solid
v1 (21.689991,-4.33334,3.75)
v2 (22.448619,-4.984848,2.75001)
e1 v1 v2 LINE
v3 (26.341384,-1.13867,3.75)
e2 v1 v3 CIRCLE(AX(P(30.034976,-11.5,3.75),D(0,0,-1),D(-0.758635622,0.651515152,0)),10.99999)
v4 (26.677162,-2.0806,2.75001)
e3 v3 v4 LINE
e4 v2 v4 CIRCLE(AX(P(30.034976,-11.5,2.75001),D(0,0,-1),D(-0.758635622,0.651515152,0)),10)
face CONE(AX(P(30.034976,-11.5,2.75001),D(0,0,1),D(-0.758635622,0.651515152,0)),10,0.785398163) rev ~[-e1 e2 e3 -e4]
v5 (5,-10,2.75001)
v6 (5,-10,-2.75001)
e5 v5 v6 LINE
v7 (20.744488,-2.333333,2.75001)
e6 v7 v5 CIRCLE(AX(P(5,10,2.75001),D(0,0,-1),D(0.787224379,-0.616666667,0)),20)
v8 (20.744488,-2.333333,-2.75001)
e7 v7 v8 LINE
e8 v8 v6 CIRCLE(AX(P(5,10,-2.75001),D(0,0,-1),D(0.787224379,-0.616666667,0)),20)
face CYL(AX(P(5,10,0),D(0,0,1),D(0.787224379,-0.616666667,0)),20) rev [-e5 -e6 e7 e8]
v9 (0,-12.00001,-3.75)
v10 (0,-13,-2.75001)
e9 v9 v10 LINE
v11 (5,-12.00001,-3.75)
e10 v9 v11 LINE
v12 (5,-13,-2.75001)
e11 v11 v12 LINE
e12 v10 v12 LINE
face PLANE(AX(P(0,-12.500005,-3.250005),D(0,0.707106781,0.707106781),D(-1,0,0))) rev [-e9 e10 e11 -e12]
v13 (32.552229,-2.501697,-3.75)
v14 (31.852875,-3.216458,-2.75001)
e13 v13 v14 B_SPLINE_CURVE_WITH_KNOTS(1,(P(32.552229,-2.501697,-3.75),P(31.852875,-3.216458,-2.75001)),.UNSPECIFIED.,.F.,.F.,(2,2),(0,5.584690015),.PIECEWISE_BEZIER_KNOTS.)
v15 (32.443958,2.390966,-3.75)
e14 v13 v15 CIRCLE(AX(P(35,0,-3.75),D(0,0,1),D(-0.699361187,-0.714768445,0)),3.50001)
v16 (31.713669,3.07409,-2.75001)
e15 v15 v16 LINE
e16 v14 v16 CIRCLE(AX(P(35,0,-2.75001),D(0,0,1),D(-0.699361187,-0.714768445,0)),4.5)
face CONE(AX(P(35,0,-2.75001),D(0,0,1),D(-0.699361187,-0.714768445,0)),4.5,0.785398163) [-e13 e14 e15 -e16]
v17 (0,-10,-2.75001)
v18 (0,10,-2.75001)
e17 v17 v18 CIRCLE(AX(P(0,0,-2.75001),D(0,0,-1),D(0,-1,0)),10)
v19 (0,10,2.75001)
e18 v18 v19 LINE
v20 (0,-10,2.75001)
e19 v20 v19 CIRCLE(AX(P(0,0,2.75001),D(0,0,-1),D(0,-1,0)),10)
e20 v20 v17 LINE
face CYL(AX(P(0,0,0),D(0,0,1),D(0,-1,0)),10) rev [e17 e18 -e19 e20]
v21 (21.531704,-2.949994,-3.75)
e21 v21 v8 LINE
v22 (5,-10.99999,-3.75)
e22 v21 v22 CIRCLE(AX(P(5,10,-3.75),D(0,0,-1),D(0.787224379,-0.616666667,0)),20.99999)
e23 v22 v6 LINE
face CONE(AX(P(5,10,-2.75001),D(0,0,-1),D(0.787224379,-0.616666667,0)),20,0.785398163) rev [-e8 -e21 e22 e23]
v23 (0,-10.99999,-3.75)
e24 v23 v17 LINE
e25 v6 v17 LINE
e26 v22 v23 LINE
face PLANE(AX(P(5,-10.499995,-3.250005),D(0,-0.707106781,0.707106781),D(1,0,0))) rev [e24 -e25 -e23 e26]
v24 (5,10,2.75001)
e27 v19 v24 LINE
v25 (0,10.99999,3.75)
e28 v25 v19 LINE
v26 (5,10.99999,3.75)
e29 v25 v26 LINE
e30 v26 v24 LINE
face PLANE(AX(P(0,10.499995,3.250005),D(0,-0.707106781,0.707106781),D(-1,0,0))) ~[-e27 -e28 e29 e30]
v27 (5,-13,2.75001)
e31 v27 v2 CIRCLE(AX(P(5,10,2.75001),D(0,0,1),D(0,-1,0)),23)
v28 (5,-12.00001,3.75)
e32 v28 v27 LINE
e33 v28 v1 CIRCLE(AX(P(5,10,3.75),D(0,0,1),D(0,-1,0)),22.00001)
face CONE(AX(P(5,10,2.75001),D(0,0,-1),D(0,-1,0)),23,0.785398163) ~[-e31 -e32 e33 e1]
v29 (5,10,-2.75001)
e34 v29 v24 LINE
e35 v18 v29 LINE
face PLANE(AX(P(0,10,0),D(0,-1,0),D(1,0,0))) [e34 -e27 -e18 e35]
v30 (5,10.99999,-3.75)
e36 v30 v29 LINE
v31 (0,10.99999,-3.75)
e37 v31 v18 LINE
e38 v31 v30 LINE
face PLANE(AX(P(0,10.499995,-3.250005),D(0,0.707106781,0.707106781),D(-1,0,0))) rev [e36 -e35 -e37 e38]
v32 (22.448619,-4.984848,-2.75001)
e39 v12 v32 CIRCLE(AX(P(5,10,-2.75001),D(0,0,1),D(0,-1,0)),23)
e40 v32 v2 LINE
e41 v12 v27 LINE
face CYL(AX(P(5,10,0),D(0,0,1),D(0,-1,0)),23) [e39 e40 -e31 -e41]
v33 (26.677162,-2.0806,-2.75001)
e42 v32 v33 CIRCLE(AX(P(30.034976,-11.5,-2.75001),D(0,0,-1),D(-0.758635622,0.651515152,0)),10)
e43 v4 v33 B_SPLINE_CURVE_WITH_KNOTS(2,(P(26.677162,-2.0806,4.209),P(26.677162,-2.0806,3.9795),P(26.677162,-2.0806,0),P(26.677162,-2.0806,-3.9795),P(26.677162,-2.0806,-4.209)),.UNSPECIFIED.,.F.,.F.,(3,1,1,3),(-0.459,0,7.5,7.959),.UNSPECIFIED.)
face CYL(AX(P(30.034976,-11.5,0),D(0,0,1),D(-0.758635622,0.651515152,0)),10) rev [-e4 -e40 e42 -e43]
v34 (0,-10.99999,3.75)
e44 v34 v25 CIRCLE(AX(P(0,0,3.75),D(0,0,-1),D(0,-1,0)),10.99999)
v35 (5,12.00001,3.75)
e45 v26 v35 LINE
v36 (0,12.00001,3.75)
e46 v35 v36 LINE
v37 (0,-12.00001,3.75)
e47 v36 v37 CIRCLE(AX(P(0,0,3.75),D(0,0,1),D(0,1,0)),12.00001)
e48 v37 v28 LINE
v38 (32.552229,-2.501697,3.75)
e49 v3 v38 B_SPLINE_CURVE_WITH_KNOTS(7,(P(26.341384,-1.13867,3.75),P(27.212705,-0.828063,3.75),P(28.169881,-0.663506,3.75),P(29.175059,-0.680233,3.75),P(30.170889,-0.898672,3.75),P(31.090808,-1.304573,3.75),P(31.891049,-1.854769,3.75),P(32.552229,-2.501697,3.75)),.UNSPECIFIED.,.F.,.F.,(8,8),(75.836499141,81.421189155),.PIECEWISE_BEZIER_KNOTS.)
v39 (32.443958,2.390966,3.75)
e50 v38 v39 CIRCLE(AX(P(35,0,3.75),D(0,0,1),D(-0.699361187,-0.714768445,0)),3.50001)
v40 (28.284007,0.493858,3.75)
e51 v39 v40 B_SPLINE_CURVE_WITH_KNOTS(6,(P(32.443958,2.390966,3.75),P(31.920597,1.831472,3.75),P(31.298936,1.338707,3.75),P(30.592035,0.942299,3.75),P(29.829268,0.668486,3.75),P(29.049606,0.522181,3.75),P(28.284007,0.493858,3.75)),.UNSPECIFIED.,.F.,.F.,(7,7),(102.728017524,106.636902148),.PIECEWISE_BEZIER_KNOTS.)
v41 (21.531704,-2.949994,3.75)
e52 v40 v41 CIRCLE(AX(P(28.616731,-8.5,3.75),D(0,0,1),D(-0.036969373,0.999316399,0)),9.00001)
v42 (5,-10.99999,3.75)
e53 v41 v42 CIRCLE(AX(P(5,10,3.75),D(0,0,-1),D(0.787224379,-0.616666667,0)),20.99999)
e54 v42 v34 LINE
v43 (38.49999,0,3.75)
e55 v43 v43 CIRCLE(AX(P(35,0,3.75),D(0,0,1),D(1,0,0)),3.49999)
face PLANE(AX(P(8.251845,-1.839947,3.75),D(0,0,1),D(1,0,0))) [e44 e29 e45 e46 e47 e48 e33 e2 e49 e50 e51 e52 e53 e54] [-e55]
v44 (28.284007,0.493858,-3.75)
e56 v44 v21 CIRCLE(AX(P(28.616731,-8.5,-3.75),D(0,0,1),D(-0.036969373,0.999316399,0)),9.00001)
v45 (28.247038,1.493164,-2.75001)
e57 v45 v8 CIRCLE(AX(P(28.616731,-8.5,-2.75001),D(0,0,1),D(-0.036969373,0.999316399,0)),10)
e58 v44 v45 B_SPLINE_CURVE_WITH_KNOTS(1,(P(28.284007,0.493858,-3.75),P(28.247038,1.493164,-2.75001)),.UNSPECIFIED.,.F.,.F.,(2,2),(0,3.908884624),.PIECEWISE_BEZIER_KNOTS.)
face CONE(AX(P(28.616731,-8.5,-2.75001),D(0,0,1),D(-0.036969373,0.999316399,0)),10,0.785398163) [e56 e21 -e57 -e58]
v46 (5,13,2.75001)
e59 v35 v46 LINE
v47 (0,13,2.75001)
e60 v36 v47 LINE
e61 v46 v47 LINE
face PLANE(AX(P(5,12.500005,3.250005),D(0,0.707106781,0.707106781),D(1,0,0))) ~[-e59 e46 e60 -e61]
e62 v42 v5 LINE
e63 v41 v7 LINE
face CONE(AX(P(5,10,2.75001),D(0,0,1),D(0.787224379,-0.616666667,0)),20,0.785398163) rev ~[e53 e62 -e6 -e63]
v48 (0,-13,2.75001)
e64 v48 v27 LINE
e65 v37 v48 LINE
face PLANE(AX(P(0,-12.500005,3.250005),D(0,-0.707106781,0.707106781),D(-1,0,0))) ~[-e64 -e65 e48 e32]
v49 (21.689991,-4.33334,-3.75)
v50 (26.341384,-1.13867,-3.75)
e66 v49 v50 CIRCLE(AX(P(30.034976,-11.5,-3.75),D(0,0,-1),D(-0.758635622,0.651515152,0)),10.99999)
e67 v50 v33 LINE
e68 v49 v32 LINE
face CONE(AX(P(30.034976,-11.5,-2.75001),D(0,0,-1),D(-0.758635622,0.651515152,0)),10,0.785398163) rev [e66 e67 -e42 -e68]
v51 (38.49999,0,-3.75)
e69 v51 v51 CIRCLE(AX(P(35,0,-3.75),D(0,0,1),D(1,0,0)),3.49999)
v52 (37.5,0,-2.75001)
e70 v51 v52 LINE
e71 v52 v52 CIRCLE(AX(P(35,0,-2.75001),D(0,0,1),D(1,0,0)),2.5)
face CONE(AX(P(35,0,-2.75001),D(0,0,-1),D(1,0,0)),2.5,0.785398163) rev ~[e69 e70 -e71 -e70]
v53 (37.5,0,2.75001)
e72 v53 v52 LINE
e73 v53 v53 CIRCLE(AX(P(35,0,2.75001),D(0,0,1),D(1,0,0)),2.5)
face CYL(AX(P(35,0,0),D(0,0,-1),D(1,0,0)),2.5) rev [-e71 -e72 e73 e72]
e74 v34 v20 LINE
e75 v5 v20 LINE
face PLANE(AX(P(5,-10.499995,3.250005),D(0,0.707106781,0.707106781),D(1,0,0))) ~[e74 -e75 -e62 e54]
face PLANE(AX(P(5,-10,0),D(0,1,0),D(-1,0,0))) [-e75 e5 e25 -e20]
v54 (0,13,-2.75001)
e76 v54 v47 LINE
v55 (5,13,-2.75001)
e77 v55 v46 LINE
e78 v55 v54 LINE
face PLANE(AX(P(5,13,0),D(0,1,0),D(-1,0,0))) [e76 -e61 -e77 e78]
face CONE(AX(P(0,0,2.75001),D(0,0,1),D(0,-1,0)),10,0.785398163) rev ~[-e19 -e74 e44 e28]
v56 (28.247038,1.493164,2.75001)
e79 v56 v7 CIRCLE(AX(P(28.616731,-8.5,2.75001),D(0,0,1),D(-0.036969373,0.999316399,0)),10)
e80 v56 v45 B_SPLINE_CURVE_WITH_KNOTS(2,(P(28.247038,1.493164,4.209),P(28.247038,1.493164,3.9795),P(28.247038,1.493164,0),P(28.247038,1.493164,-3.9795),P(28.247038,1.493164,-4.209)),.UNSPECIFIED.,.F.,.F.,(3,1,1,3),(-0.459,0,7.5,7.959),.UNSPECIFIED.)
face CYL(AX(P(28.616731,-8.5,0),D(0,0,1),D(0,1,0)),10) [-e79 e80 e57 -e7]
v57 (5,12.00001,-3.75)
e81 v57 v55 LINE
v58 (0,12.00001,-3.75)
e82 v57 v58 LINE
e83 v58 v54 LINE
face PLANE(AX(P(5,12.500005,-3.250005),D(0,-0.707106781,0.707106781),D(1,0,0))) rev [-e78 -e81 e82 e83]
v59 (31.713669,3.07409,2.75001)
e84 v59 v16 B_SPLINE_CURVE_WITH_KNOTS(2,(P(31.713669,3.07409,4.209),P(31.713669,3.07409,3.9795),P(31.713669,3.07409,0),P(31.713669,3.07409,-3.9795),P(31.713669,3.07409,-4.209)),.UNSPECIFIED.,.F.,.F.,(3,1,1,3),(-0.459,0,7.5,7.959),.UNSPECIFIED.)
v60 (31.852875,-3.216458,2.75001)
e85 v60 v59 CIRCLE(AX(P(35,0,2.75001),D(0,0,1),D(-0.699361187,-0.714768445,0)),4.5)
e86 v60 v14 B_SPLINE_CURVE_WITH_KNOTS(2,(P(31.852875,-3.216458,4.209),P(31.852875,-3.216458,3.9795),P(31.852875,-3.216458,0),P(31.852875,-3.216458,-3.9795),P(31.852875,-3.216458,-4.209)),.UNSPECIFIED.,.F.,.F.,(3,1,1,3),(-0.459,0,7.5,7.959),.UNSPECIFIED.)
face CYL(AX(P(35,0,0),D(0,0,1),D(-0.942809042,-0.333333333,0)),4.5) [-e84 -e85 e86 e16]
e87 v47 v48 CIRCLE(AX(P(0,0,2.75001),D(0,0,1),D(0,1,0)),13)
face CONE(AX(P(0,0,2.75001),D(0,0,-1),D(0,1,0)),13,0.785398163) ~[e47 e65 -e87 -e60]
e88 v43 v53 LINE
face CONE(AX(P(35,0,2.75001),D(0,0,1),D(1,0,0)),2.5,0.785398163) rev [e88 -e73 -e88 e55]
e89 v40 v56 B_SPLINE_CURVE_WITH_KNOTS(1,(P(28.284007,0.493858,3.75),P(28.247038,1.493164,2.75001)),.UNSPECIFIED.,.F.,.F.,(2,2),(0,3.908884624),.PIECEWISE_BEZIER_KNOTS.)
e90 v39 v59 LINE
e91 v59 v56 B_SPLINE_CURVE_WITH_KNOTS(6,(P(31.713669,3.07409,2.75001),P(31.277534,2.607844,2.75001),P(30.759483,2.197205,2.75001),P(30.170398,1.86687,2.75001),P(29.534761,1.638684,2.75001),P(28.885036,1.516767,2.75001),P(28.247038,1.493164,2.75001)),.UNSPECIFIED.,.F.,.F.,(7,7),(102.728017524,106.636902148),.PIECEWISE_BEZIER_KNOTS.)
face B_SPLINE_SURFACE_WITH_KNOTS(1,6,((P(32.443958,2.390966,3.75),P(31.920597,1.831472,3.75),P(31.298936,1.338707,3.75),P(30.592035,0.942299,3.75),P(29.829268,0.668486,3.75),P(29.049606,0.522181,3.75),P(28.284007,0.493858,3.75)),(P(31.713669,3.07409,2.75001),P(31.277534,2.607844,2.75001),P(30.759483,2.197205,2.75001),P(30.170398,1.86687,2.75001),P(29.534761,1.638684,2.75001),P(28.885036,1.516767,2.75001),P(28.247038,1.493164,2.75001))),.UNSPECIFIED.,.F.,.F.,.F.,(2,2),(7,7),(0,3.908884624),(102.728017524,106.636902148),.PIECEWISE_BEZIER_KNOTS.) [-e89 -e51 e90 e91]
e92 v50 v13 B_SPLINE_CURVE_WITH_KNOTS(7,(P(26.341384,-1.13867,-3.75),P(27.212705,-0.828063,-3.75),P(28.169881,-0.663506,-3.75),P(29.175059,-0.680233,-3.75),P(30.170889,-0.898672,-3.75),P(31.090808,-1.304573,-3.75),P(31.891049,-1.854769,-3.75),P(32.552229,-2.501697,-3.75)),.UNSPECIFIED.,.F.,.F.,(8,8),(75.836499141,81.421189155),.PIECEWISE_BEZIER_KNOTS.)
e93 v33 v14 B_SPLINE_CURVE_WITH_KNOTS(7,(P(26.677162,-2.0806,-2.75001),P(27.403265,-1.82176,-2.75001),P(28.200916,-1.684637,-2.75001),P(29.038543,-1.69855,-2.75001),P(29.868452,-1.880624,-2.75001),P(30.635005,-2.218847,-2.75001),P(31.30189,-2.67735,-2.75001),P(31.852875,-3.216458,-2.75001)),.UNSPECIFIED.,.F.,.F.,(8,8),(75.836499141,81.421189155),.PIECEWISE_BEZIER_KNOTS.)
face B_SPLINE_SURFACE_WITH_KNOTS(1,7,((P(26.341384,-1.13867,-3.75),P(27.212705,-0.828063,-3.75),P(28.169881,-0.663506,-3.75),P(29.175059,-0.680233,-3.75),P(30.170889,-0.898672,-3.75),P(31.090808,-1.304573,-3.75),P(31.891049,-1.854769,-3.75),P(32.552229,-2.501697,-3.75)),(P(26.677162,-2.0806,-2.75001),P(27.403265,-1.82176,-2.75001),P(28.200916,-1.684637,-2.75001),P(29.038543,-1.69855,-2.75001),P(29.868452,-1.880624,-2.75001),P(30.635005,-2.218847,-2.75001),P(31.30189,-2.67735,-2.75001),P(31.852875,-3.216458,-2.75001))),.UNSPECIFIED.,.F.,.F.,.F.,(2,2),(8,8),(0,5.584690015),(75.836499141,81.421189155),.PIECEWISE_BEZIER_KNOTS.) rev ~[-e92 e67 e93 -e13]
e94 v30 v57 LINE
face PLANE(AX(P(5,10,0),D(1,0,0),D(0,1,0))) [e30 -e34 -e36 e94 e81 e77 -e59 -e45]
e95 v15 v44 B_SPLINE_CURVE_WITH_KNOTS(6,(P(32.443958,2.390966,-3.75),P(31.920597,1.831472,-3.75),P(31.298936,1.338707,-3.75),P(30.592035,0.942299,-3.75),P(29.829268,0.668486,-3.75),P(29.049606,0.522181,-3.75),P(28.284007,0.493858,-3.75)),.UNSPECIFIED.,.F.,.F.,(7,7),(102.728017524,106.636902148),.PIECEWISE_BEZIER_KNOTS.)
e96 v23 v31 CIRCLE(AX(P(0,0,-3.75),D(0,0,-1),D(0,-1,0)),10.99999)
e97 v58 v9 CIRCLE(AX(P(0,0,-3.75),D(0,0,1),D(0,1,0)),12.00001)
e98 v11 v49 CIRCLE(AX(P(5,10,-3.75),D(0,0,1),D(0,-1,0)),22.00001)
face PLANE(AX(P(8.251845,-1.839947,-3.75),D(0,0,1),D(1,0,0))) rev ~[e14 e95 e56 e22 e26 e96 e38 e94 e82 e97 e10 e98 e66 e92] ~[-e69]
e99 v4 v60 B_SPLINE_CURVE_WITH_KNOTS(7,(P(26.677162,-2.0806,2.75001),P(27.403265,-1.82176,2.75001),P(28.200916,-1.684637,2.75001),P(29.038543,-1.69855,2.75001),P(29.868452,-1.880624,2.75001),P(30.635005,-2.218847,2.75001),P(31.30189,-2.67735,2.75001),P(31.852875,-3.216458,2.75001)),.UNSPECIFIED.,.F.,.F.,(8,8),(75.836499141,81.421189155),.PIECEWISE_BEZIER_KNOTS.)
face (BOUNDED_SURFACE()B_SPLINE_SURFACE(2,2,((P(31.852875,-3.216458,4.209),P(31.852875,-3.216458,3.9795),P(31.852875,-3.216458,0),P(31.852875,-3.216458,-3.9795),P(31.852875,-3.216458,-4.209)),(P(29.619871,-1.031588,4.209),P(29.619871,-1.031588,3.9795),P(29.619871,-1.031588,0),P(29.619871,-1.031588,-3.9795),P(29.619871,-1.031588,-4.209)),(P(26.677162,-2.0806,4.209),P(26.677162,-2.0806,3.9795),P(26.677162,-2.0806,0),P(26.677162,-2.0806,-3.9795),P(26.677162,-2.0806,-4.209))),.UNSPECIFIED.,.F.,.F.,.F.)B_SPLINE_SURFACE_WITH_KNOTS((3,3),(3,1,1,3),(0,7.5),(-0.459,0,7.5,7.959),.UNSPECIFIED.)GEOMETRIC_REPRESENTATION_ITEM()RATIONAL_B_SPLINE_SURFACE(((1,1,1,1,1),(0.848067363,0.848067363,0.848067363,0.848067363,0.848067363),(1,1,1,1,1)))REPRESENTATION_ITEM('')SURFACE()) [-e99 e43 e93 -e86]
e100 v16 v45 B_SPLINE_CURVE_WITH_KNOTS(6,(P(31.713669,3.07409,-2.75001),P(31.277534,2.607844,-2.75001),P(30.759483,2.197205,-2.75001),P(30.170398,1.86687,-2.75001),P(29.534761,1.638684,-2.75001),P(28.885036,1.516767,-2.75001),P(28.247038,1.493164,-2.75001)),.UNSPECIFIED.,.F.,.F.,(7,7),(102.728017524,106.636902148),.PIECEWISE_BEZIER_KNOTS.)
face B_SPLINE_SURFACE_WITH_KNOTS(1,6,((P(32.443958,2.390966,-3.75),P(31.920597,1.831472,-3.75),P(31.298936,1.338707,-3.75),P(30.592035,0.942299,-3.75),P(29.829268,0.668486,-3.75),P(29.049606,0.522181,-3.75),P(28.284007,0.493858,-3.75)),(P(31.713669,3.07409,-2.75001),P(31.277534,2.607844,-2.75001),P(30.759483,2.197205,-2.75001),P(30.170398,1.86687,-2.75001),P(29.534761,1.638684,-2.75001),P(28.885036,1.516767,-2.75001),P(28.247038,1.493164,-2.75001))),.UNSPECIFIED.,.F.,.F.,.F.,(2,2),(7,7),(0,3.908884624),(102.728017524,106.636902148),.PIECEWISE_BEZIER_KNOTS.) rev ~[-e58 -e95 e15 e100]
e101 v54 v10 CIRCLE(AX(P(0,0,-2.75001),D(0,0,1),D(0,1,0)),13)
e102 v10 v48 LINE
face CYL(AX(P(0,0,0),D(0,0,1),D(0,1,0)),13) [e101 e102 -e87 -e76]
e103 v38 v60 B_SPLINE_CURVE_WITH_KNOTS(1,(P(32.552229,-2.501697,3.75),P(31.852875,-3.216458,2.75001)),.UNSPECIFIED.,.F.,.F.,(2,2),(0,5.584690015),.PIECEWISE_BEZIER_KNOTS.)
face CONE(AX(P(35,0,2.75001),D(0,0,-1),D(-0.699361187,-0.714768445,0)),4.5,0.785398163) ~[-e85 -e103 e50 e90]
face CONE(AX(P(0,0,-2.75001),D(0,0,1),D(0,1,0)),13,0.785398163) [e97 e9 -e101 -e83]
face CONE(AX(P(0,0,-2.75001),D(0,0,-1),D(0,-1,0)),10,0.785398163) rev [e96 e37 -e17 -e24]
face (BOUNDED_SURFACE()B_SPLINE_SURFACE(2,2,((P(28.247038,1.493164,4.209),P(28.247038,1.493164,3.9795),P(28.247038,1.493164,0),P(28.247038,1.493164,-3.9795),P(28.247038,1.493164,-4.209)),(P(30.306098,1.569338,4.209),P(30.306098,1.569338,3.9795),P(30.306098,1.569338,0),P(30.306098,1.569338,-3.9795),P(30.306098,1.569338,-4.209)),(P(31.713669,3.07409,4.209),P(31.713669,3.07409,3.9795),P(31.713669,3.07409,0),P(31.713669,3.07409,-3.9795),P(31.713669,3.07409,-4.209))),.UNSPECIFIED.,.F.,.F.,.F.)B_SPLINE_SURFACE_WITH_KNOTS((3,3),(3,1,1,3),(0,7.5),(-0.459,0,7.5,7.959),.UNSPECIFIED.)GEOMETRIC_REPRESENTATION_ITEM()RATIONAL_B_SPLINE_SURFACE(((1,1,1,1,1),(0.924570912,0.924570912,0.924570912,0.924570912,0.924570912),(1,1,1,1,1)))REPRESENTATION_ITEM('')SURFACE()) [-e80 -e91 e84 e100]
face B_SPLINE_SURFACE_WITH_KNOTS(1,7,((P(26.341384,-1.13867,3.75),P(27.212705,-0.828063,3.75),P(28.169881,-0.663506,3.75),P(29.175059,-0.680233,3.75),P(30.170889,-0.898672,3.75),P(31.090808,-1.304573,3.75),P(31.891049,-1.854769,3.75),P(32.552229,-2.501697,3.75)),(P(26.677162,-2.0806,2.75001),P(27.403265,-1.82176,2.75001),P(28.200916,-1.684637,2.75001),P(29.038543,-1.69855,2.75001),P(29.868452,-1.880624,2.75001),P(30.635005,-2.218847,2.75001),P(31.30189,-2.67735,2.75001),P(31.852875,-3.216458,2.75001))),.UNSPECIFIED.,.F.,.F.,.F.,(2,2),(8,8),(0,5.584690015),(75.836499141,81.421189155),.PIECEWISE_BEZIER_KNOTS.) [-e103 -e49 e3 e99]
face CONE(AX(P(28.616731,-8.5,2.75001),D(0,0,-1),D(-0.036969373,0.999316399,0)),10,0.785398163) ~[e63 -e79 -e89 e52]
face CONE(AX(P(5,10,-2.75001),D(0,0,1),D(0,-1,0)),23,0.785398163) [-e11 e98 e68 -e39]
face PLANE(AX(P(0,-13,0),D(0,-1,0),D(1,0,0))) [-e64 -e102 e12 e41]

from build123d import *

# Parameters (mm, degrees)
F0_R     = 2.5
F1_DEPTH = 3.75
F2_R     = 5
F3_SIZE  = 0.99999


# Not quite as in the source:
# - a fillet or chamfer is up to 0.001 mm smaller than in the source, because OpenCascade refuses the exact size


with BuildPart() as f1:
    # F0 (on Top) → F1 (new body, symmetric)
    with BuildSketch(Plane.XY):
        with BuildLine():
            ThreePointArc((0, -10), (-10, 0), (0, 10))
            Line((0, 10), (5, 10))
            Line((5, 10), (5, 13))
            Line((5, 13), (0, 13))
            ThreePointArc((0, 13), (-13, 0), (0, -13))
            Line((0, -13), (5, -13))
            ThreePointArc((5, -13), (14.6007417643, -10.9003769721), (22.4486193117, -4.9848484848))
            ThreePointArc((22.4486193117, -4.9848484848), (25.8607399846, -2.4128795773), (30.0349755342, -1.5))
            Line((30.0349755342, -1.5), (30.7573593129, -1.5))
            ThreePointArc((30.7573593129, -1.5), (39.5, 0), (30.7573593129, 1.5))
            Line((30.7573593129, 1.5), (28.6167313572, 1.5))
            ThreePointArc((28.6167313572, 1.5), (24.2387561784, 0.4907359728), (20.7444875715, -2.3333333333))
            ThreePointArc((20.7444875715, -2.3333333333), (13.7559503577, -7.9814719457), (5, -10))
            Line((5, -10), (0, -10))
        make_face()
        with Locations((35, 0)):
            Circle(F0_R, mode=Mode.SUBTRACT)
    extrude(amount=F1_DEPTH, both=True)

    # F2
    f2_edges = [f1.edges().sort_by_distance(p)[0] for p in [
        (30.757359, -1.5, 0),
        (30.757359, 1.5, 0),
    ]]
    fillet(f2_edges, radius=F2_R)

    # F3 (size 1 in the source; OpenCascade refuses exactly that, so slightly less here)
    f3_edges = [f1.edges().sort_by_distance(p)[0] for p in [
        (39.498899, 0.099557, -3.75),
        (39.498899, 0.099557, 3.75),
        (32.5, 0, -3.75),
        (32.5, 0, 3.75),
    ]]
    chamfer(f3_edges, length=F3_SIZE)


solid = f1.part
